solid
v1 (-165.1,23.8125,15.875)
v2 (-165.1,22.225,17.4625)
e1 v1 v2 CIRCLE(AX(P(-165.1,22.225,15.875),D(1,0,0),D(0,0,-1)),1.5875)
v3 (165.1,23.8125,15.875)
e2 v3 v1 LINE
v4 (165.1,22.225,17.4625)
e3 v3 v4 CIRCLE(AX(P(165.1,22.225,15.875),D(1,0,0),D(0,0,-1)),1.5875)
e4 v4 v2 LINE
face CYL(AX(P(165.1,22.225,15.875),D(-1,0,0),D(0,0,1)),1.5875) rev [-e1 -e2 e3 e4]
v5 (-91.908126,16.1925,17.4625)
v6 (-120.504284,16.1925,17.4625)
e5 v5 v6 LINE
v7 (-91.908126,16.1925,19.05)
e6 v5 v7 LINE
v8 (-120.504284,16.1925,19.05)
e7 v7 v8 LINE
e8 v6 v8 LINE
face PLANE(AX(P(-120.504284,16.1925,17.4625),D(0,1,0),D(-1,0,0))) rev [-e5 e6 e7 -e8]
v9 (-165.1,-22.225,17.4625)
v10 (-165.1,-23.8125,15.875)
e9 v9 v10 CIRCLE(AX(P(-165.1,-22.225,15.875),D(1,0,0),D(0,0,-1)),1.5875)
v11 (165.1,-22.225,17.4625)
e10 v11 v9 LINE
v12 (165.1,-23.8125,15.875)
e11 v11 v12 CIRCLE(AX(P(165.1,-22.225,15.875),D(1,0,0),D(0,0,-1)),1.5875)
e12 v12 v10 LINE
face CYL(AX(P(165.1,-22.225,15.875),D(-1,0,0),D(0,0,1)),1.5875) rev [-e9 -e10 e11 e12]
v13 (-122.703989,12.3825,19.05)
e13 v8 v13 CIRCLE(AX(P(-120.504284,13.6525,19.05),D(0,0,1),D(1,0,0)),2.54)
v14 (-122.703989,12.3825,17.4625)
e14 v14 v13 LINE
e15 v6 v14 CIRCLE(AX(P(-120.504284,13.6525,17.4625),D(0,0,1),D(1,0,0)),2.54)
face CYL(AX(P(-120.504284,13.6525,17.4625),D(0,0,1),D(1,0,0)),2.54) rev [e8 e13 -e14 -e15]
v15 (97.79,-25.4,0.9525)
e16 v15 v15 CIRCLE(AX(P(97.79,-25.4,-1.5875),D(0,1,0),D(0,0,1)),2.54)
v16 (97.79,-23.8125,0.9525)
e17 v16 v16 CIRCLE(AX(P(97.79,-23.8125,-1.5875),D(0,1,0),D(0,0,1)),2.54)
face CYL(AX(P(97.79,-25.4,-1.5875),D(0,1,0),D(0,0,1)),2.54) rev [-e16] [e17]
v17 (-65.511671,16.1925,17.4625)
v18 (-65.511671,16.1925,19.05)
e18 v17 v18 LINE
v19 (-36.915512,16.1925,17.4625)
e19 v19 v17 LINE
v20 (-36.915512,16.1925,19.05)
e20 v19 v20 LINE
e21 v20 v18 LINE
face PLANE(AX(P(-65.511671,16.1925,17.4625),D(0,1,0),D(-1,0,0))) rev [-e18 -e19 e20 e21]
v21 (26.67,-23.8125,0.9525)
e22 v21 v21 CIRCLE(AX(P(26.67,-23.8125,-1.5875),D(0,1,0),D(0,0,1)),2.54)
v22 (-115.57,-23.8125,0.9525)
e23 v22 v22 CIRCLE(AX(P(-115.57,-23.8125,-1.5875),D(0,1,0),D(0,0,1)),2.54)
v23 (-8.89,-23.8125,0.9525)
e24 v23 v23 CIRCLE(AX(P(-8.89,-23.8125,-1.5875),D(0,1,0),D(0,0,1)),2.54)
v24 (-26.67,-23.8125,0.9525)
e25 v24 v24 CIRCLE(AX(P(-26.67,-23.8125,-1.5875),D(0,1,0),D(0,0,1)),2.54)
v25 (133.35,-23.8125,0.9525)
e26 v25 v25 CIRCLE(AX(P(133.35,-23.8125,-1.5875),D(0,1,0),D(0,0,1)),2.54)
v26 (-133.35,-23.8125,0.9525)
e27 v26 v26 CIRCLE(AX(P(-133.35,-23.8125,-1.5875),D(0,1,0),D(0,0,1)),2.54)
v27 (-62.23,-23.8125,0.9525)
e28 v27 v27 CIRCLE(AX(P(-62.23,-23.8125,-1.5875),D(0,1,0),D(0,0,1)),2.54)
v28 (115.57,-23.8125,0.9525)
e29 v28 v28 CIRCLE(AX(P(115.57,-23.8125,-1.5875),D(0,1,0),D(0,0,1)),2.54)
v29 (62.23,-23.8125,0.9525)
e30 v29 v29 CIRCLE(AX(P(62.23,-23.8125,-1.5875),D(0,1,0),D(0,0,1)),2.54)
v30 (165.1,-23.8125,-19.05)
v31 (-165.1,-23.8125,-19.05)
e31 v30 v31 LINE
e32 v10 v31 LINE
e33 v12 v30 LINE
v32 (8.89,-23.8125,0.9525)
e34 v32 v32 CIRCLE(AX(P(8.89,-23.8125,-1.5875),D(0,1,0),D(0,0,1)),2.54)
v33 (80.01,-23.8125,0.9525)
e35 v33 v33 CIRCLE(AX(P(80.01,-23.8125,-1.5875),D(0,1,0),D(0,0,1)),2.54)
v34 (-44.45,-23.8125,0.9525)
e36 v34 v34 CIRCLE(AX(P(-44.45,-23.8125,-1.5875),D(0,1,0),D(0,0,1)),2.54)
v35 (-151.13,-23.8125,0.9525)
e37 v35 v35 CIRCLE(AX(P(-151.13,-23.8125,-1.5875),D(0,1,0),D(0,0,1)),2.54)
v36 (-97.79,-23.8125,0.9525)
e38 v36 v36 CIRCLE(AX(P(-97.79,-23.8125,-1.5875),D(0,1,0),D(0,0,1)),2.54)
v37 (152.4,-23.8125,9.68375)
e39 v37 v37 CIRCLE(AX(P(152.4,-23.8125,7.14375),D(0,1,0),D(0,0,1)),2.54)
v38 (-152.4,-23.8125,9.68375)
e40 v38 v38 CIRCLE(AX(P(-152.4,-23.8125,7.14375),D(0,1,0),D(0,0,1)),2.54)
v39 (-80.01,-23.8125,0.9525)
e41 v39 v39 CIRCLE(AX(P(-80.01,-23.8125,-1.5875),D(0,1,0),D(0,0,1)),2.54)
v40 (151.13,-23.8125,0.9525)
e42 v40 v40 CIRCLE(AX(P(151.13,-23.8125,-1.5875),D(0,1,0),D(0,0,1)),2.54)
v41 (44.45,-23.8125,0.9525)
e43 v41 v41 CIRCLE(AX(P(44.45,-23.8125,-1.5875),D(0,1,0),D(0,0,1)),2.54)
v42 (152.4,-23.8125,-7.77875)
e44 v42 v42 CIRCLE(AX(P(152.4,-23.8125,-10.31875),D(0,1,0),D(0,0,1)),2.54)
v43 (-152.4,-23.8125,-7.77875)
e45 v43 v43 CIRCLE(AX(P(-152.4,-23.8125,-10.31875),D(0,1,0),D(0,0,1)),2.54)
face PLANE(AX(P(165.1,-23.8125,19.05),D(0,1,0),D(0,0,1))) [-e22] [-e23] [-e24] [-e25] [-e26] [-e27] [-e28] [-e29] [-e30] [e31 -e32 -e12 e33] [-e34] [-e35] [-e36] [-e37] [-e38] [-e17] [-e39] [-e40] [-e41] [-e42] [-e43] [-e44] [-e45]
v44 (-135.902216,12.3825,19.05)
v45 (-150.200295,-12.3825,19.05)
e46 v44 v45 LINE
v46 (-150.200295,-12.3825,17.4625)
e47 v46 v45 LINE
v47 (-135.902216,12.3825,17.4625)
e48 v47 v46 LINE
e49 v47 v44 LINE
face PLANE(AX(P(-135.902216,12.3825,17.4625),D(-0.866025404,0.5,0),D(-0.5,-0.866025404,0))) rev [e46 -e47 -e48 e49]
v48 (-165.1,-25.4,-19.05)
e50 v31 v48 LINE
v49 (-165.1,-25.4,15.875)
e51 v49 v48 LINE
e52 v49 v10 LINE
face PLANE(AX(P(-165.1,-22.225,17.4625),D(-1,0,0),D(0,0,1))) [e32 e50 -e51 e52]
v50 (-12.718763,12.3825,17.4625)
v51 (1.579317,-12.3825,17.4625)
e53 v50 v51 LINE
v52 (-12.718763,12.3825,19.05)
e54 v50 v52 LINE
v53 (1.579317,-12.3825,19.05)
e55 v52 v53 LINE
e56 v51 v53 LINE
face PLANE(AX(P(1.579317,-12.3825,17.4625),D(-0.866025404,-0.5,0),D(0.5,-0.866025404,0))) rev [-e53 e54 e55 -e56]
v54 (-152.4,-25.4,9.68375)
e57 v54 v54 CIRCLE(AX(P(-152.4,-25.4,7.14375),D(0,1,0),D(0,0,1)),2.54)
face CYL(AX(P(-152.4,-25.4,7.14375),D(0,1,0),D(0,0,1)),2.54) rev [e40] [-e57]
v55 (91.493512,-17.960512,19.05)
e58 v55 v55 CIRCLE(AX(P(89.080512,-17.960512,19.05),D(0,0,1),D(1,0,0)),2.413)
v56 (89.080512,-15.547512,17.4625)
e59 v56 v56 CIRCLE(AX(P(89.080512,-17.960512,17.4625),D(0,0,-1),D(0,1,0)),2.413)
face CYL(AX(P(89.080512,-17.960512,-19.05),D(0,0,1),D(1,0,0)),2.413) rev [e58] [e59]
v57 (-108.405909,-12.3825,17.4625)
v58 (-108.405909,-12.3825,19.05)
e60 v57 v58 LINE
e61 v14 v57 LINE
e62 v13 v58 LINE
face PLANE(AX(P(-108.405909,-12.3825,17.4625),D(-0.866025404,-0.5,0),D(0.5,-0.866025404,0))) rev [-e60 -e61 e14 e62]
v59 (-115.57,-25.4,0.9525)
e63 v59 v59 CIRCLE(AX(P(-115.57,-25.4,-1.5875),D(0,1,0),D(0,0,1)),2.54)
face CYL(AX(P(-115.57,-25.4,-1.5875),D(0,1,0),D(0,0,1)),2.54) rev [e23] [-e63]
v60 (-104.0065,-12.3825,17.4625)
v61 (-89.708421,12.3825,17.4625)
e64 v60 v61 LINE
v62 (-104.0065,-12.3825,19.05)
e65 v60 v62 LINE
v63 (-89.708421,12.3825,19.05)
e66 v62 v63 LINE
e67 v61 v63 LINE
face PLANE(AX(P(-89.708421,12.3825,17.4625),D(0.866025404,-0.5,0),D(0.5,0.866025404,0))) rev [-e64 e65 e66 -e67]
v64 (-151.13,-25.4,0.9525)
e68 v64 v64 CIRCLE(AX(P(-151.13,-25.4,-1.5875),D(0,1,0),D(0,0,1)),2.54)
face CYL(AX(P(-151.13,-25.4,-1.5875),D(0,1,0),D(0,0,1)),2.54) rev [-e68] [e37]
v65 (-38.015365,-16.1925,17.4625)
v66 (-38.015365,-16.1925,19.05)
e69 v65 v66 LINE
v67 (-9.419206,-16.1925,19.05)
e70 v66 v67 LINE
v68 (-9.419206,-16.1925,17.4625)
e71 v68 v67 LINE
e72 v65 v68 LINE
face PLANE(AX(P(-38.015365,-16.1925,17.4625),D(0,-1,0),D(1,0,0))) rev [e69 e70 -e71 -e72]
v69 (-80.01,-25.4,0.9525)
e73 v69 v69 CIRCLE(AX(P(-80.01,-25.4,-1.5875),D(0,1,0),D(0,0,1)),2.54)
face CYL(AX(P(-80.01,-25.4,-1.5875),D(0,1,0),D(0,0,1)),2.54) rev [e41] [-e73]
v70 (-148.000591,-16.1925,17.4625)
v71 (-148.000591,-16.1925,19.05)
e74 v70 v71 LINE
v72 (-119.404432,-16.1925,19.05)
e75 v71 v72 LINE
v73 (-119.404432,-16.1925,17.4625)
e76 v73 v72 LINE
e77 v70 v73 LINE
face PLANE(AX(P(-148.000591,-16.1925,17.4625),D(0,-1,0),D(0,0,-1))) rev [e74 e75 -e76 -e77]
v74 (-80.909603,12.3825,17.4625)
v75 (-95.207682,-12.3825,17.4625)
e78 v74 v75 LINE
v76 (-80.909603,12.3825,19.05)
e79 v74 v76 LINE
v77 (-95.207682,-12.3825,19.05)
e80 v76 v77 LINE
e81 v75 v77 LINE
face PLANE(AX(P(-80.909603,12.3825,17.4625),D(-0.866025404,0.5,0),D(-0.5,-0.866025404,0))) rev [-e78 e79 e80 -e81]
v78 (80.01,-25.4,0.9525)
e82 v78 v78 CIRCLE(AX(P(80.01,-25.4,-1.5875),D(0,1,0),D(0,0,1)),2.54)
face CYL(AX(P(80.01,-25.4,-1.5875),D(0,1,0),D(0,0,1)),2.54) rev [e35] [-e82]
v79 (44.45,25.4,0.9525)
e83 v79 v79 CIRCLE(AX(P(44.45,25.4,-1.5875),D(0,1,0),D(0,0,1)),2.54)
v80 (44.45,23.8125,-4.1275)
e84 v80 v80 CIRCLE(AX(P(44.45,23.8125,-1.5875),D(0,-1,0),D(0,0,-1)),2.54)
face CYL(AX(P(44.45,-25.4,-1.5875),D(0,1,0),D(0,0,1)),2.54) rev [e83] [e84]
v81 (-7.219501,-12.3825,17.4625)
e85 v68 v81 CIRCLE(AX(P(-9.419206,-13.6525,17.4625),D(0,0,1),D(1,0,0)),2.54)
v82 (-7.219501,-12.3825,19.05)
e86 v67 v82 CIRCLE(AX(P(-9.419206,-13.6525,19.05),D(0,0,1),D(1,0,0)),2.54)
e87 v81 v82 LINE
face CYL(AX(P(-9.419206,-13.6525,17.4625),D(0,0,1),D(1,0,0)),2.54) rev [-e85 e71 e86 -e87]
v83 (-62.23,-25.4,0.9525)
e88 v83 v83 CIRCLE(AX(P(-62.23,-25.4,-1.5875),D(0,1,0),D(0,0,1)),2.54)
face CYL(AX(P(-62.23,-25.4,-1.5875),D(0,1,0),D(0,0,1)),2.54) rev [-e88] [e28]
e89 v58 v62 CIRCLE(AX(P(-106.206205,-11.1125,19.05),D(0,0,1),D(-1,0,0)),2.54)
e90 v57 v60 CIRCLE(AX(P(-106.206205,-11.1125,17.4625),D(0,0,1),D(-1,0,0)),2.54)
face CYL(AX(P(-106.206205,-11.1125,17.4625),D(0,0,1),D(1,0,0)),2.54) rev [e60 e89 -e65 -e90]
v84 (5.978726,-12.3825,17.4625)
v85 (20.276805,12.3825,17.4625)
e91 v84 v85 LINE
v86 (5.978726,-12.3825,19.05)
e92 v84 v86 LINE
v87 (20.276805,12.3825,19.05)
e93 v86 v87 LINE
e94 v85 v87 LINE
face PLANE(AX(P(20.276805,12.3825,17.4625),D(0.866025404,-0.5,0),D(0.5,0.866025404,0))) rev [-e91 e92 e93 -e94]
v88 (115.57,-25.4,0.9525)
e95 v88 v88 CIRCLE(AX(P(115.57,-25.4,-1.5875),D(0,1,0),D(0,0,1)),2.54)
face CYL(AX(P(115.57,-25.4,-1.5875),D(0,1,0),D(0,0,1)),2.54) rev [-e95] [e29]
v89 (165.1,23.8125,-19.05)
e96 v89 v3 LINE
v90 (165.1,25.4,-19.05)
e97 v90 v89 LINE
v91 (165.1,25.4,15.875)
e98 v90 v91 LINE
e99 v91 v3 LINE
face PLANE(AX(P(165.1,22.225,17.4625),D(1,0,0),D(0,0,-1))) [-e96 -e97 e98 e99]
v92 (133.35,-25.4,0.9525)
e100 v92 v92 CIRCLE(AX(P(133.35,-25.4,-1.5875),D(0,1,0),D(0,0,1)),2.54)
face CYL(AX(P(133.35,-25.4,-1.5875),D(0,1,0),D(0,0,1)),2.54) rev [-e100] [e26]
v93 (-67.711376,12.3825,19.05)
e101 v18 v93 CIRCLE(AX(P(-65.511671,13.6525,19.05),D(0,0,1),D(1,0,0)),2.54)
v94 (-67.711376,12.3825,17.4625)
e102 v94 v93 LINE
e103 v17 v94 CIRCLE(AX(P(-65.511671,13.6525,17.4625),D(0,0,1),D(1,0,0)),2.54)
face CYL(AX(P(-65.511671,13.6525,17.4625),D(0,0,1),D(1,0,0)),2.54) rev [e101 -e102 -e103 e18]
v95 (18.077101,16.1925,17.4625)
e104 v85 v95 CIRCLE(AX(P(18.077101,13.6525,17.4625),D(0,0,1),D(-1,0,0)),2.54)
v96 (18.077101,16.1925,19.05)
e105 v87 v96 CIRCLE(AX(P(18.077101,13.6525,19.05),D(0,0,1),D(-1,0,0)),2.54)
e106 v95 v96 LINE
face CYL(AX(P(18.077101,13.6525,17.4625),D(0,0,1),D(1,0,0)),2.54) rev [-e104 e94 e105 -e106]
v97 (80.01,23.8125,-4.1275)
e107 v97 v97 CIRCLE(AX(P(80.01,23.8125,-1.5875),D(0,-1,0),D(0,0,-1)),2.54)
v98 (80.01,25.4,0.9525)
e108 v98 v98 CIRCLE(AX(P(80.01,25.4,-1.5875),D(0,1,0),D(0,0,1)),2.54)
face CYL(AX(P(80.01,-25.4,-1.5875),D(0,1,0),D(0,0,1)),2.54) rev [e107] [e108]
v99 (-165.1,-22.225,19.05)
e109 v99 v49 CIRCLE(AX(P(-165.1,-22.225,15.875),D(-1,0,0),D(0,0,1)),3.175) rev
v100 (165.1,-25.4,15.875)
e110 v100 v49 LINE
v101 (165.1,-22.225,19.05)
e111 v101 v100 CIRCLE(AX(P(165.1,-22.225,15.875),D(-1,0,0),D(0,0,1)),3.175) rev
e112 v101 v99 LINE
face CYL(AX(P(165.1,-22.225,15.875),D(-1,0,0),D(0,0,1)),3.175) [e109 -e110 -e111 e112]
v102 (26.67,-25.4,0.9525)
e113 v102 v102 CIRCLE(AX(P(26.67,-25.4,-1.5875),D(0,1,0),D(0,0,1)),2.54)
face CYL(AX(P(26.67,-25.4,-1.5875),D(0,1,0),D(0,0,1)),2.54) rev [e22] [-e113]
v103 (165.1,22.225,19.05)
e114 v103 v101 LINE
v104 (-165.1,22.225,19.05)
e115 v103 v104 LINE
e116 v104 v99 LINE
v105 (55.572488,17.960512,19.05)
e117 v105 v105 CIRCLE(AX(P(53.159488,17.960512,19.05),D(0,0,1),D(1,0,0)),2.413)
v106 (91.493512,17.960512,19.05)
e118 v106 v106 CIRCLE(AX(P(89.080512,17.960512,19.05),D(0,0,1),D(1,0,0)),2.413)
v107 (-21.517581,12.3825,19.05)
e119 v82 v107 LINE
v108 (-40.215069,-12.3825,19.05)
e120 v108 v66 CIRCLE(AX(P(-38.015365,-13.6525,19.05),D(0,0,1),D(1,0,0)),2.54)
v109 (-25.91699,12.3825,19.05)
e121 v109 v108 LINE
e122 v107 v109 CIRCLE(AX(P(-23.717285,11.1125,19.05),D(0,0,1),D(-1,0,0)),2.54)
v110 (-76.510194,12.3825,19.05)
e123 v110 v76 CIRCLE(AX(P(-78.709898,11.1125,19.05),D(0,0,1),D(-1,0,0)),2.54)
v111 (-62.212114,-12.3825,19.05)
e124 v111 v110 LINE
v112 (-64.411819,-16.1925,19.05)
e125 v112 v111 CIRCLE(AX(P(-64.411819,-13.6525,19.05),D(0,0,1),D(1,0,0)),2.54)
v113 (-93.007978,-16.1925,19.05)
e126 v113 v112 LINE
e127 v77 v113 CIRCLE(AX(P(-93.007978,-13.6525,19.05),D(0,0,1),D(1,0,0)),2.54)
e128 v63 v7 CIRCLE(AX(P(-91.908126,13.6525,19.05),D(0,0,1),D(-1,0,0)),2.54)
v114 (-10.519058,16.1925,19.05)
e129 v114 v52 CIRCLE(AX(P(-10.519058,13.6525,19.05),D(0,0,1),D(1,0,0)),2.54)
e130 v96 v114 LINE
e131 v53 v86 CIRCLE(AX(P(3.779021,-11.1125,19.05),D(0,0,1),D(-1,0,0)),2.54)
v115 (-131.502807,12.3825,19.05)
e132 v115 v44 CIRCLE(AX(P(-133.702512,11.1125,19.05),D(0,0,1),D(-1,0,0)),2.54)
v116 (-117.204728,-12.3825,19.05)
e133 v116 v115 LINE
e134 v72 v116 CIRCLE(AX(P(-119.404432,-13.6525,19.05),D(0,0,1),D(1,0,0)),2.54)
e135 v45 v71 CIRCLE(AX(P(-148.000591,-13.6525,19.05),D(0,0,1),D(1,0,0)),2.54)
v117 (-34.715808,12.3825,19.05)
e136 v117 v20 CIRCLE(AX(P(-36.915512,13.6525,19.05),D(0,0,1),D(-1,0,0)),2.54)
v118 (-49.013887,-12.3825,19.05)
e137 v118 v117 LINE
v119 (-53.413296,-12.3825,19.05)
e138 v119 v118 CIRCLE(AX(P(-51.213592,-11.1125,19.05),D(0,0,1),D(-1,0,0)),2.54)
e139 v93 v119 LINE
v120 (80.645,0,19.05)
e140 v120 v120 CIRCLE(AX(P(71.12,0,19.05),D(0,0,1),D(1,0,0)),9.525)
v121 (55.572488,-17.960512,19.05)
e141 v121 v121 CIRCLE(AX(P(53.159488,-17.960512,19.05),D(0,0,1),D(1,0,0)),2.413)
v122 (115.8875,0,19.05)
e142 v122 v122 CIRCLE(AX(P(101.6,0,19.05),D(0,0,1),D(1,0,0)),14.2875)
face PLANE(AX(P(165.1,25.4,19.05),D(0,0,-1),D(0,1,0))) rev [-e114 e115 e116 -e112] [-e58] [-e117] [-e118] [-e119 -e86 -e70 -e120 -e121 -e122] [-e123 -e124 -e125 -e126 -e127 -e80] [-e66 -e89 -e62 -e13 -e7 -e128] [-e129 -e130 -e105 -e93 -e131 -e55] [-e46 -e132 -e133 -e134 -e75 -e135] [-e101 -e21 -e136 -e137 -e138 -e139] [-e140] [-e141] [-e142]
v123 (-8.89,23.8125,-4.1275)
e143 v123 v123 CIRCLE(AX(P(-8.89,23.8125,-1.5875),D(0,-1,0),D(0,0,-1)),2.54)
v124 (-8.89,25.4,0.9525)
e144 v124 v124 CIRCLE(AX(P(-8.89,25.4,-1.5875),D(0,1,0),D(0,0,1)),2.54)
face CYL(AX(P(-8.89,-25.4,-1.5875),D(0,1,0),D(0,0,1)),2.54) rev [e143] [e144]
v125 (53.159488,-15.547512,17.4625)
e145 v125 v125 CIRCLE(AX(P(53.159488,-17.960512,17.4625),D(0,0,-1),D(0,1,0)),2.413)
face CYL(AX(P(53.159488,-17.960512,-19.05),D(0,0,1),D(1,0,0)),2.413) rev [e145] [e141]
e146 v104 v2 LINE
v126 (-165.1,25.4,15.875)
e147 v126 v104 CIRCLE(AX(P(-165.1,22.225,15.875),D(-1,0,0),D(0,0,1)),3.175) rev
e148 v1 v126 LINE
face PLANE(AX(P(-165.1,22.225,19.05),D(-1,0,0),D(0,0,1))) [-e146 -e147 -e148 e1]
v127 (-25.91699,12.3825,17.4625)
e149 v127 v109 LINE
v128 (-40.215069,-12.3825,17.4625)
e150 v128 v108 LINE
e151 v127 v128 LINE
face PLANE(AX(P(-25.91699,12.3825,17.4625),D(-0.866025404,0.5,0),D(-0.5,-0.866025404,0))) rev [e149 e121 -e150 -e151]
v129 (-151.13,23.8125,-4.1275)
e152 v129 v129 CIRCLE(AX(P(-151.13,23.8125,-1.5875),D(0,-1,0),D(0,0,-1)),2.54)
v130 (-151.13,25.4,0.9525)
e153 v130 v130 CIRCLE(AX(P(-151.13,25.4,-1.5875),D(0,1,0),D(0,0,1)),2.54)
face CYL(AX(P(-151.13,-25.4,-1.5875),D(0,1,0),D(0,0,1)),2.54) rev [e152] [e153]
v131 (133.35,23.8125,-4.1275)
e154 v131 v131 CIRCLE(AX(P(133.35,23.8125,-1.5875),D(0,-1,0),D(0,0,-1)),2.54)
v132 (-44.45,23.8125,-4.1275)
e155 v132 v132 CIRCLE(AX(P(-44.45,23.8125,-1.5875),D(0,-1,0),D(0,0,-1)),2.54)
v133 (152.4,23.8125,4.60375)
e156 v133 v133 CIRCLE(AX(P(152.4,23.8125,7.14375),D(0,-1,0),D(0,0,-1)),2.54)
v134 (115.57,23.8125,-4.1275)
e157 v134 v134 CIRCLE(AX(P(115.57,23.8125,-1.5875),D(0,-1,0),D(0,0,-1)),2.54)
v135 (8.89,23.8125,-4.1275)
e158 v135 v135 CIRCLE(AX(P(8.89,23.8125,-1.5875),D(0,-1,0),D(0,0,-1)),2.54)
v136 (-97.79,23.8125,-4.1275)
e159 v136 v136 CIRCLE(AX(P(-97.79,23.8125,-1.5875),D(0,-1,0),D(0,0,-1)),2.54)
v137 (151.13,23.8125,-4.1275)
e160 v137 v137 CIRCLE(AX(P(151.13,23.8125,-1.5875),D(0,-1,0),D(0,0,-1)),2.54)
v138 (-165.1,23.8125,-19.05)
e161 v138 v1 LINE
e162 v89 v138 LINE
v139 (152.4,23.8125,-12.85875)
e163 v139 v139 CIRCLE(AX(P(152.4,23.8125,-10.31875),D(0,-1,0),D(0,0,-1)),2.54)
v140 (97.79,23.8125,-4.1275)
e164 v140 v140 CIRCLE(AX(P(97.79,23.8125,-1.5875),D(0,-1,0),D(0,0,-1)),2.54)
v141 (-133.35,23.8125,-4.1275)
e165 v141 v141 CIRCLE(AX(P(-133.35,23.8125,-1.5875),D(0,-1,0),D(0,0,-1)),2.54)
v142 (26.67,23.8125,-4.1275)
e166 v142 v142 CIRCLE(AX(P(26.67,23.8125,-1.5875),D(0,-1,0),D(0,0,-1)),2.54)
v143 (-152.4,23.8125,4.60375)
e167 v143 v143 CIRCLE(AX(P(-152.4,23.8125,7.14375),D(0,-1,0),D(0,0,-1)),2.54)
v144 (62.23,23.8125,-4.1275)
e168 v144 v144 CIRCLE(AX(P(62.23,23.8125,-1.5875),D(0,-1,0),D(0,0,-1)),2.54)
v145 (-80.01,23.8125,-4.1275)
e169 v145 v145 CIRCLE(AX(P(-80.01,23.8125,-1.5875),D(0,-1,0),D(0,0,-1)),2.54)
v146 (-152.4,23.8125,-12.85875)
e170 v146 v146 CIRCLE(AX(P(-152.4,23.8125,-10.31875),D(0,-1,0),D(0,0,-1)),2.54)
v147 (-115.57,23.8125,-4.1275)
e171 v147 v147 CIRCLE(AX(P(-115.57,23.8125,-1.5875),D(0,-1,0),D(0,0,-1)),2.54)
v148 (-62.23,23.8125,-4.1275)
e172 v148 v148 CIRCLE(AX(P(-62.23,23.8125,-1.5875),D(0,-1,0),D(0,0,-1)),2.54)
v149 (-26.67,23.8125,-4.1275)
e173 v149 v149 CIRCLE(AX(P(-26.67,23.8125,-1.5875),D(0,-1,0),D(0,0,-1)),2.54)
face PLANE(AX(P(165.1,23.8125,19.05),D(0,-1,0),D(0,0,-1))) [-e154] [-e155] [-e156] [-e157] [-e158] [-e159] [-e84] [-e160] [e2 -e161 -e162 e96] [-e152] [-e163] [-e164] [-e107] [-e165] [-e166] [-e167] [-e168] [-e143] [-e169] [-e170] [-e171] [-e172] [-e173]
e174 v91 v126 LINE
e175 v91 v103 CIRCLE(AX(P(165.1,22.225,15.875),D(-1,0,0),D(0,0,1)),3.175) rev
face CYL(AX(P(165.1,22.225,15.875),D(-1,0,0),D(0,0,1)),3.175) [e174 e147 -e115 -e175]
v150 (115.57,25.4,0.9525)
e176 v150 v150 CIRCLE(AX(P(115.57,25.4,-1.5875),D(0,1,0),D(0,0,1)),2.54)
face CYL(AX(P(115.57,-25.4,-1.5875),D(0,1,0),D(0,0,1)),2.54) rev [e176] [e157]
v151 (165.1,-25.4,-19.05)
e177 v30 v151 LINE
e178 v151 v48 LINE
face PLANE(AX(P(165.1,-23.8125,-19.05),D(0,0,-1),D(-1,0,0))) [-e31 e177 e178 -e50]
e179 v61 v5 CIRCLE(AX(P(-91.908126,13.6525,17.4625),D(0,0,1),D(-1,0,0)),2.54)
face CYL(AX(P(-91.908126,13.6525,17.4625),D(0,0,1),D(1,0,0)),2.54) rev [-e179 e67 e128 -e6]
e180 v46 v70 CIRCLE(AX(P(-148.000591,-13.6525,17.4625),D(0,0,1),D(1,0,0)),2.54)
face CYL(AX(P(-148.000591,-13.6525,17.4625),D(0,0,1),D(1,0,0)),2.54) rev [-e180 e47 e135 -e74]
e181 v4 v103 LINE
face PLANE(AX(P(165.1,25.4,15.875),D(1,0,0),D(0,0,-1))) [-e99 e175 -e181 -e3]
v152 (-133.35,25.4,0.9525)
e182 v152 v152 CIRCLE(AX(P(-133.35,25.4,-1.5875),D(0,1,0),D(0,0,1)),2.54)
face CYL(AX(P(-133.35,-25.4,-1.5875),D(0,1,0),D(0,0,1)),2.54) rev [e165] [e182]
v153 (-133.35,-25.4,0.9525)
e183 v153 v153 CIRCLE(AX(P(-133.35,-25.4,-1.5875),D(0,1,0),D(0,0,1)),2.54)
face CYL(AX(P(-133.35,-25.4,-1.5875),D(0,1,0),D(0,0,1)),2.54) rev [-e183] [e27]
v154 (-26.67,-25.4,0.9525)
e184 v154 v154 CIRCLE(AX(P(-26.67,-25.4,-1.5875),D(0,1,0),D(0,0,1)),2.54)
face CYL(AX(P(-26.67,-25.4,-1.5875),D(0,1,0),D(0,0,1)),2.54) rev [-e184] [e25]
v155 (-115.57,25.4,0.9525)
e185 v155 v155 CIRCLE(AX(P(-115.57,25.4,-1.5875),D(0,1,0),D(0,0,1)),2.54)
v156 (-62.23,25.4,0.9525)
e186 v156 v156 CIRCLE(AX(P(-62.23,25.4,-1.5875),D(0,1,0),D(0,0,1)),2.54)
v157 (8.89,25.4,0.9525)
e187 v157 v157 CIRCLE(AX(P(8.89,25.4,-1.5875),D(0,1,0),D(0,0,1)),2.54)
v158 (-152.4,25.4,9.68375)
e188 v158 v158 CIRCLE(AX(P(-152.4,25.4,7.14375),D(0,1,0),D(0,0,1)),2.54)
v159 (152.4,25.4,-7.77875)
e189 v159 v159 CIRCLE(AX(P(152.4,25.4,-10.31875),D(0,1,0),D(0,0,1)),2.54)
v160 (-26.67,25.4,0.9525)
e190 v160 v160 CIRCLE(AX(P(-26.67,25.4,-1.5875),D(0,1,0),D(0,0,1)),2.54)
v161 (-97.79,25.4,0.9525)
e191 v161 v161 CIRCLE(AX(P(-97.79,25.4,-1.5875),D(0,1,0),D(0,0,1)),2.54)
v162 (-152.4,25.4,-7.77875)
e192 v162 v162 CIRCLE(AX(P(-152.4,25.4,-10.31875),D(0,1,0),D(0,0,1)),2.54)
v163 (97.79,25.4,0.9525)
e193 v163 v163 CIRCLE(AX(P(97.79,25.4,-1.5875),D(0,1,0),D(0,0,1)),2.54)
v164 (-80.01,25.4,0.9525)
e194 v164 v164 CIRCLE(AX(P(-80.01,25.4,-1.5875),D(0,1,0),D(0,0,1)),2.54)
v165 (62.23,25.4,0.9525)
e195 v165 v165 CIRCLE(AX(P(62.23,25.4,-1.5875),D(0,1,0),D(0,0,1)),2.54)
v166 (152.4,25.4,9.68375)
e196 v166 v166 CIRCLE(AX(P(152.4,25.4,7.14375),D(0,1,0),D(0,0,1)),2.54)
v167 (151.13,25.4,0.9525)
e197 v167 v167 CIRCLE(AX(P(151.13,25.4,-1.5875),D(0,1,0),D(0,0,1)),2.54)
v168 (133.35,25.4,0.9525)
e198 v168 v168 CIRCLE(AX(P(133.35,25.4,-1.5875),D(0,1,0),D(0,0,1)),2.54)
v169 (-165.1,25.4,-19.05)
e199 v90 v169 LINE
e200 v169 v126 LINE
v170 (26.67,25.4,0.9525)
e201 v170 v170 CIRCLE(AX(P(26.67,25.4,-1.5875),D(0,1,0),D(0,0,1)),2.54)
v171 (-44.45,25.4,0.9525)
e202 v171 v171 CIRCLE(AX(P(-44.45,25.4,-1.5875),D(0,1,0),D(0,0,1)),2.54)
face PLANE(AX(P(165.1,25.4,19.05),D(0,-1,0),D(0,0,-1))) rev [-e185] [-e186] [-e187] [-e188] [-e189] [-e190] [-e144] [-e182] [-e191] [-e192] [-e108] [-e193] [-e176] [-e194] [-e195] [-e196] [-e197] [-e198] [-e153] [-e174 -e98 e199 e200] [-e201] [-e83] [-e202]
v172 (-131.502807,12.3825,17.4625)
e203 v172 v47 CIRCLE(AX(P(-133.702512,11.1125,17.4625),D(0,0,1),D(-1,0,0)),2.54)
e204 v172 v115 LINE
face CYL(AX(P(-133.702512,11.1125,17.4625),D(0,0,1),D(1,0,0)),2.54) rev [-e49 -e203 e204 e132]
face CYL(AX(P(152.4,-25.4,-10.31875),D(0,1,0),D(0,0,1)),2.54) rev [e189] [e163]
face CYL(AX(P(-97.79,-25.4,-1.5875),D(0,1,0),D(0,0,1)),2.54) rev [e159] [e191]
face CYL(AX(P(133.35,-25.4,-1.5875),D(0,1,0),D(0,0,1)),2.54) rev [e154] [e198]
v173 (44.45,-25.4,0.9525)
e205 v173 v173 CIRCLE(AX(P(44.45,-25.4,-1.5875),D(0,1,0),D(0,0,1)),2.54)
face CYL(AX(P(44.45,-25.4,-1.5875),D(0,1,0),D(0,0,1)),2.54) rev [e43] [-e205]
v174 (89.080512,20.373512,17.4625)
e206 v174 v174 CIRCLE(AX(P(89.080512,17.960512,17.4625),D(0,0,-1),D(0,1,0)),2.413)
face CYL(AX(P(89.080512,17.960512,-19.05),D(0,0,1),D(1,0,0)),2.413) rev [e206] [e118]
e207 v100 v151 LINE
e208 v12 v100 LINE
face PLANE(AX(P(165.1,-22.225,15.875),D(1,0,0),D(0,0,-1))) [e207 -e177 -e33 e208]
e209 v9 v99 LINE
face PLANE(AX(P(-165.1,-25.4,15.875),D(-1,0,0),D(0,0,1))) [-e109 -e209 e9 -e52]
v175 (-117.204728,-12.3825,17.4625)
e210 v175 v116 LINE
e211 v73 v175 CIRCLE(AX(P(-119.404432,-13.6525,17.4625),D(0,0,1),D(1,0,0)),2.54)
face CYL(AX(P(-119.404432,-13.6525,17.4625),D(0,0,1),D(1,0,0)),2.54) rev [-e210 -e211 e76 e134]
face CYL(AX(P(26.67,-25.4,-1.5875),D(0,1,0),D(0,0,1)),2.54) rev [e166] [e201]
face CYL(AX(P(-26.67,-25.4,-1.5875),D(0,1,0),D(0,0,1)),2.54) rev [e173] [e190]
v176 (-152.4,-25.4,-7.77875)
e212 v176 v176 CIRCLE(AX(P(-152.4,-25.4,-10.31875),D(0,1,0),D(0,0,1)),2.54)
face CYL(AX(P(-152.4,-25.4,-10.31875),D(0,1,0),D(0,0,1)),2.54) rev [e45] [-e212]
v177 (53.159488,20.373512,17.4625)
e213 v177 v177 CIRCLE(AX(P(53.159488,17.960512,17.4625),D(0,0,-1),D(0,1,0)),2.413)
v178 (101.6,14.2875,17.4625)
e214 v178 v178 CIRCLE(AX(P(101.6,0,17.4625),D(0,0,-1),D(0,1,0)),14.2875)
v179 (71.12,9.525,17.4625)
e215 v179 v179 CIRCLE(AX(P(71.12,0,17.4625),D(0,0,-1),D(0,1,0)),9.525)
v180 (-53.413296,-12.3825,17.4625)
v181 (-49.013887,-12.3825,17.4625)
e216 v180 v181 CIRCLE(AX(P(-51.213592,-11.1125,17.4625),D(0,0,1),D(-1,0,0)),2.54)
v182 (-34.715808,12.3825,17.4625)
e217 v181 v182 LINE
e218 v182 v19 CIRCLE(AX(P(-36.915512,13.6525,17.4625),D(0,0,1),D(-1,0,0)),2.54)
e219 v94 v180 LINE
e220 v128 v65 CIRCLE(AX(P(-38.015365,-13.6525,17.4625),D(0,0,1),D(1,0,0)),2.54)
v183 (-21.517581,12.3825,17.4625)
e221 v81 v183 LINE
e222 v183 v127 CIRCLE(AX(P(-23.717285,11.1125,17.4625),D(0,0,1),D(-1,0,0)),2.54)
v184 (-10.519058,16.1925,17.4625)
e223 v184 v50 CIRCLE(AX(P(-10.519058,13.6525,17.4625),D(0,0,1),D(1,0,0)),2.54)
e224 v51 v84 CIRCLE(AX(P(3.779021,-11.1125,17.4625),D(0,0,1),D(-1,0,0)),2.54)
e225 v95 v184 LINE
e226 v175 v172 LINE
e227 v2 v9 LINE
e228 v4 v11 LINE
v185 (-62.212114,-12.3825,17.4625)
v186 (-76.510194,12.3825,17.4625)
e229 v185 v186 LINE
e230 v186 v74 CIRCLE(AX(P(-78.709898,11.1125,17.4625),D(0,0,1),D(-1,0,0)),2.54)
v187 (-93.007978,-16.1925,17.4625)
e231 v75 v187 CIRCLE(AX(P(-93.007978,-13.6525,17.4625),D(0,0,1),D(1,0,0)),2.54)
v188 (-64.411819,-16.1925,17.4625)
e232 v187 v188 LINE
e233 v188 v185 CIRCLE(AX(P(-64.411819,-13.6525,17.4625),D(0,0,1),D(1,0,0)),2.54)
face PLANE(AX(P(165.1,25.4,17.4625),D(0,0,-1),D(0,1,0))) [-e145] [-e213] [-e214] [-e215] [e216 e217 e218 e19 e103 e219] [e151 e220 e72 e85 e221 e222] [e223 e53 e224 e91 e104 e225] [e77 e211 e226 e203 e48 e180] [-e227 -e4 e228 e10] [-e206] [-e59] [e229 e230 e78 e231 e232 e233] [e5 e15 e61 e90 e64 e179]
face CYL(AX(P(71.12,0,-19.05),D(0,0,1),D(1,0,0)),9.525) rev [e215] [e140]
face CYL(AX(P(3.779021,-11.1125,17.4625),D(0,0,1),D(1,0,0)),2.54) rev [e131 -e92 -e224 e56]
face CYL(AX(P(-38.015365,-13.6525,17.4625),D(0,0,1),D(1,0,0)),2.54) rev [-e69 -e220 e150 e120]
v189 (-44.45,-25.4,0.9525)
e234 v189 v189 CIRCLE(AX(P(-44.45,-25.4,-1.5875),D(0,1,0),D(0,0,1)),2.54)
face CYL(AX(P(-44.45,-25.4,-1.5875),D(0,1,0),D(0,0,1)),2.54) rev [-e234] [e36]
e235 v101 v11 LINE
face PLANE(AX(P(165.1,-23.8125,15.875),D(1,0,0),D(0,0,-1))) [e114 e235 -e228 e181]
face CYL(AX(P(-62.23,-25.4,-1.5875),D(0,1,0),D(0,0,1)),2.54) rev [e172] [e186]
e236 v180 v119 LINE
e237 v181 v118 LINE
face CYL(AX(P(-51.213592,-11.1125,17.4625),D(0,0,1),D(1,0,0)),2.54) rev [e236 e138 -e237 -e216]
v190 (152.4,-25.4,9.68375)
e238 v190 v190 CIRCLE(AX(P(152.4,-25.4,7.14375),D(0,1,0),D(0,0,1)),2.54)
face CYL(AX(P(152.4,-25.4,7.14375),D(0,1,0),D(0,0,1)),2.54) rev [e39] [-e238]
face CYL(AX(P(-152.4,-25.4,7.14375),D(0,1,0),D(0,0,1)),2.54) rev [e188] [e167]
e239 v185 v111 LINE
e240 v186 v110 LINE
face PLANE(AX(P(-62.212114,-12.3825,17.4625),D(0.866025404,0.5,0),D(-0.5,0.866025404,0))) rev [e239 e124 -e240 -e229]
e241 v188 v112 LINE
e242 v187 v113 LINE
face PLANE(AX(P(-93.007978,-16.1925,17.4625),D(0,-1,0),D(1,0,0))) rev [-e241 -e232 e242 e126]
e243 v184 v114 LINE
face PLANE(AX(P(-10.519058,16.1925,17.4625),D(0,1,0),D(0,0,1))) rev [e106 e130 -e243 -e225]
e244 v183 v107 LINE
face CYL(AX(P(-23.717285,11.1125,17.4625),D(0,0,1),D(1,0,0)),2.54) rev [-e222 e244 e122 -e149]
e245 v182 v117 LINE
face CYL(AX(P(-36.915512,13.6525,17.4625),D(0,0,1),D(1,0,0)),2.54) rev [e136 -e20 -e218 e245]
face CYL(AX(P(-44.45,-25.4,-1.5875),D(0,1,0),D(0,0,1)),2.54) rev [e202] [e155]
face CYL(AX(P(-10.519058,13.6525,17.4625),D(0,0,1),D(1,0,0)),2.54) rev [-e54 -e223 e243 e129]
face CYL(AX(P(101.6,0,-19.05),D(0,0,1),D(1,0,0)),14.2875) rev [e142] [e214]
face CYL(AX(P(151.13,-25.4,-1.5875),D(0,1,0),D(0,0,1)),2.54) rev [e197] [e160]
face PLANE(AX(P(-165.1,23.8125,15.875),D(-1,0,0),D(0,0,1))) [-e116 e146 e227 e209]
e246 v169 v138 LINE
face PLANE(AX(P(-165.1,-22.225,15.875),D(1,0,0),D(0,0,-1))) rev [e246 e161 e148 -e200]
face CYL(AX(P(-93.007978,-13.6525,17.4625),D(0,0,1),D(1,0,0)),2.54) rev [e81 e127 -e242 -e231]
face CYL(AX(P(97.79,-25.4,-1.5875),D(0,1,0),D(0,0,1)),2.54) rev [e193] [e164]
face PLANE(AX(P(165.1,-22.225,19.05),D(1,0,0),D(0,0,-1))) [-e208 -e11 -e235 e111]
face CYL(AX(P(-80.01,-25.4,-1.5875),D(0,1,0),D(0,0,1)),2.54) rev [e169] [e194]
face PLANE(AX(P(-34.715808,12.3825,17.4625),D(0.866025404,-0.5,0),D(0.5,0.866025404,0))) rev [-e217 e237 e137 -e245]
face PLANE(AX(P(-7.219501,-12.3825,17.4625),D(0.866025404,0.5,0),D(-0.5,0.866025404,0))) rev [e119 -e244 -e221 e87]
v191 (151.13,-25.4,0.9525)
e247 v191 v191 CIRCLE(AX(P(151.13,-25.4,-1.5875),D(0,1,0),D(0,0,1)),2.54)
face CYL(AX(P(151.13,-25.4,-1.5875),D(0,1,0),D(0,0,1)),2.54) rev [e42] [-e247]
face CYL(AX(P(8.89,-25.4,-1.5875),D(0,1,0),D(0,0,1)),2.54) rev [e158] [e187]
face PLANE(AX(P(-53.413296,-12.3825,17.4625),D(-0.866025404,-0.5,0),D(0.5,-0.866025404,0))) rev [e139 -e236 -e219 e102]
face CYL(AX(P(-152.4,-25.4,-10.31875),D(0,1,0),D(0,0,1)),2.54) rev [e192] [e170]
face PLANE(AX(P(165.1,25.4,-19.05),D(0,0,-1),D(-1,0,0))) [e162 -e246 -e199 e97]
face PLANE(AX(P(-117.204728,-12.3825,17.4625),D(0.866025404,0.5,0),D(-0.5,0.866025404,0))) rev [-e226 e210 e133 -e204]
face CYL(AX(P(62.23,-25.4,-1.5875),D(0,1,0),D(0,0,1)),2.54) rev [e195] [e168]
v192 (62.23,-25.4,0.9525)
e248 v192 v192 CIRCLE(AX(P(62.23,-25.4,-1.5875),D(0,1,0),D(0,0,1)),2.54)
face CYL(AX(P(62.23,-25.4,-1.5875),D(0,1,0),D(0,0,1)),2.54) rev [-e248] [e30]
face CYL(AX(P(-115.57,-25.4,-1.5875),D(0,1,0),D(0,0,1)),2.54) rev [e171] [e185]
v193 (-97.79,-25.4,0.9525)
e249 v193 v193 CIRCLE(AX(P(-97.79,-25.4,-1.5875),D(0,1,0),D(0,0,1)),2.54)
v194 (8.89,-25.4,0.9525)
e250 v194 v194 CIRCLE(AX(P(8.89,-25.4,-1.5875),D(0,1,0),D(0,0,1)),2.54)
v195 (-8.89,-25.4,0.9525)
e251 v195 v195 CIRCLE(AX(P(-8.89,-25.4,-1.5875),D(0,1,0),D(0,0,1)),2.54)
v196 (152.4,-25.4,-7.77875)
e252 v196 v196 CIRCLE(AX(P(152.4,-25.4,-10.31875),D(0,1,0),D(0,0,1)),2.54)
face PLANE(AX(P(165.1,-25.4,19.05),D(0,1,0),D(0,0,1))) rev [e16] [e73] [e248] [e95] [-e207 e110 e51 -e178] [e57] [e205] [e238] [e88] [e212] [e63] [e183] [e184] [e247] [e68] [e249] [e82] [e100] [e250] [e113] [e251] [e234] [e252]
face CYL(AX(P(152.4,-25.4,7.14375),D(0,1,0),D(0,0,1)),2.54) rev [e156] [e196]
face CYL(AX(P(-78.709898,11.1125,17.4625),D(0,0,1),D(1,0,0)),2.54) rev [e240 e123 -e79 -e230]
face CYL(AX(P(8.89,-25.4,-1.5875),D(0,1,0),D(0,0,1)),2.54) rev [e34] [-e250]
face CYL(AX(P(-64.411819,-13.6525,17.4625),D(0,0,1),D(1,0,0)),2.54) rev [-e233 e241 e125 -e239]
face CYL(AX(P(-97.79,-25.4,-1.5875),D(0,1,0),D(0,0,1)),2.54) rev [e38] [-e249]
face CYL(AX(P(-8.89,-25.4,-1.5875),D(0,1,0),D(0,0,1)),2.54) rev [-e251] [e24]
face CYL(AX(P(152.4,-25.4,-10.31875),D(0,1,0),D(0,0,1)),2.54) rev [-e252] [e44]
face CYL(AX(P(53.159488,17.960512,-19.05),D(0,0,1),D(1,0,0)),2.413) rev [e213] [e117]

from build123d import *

# Parameters (mm, degrees)
BASE_FLANGE2_DEPTH = 165.1
SKETCH10_R         = 2.54
CUT_EXTRUDE1_DEPTH = 174.785938729
SKETCH11_R         = 14.2875
SKETCH11_R_2       = 9.525
SKETCH11_R_3       = 2.413
CUT_EXTRUDE2_DEPTH = 172.332367053
CUT_EXTRUDE3_DEPTH = 2.54
SKETCH13_R         = 2.54
CUT_EXTRUDE4_DEPTH = 174.785938729


# Sheet-metal steps are written as plain solids
with BuildPart() as part:
    # Sketch1 → Base-Flange2 (new, symmetric)
    with BuildSketch(Plane(origin=(0, 0, 0), x_dir=(0, 0, -1), z_dir=(1, 0, 0))):
        with BuildLine():
            Line((19.05, -25.4), (-15.875, -25.4))
            ThreePointArc((-15.875, -25.4), (-18.12006403, -24.47006403), (-19.05, -22.225))
            Line((-19.05, -22.225), (-19.05, 22.225))
            ThreePointArc((-19.05, 22.225), (-18.12006403, 24.47006403), (-15.875, 25.4))
            Line((-15.875, 25.4), (19.05, 25.4))
            Line((19.05, 25.4), (19.05, 23.8125))
            Line((19.05, 23.8125), (-15.875, 23.8125))
            ThreePointArc((-15.875, 23.8125), (-16.997532015, 23.347532015), (-17.4625, 22.225))
            Line((-17.4625, 22.225), (-17.4625, -22.225))
            ThreePointArc((-17.4625, -22.225), (-16.997532015, -23.347532015), (-15.875, -23.8125))
            Line((-15.875, -23.8125), (19.05, -23.8125))
            Line((19.05, -23.8125), (19.05, -25.4))
        make_face()
    extrude(amount=BASE_FLANGE2_DEPTH, both=True)

    # Sketch10 → Cut-Extrude1 (cut, through all)
    with BuildSketch(Plane(origin=(0, 25.4, 0), x_dir=(1, 0, 0), z_dir=(0, 1, 0))):
        with Locations(Location((151.13, 1.5875, 0), (0, 0, 270))):
            Circle(SKETCH10_R)
        with Locations(Location((133.35, 1.5875, 0), (0, 0, 270))):
            Circle(SKETCH10_R)
        with Locations(Location((115.57, 1.5875, 0), (0, 0, 270))):
            Circle(SKETCH10_R)
        with Locations(Location((97.79, 1.5875, 0), (0, 0, 270))):
            Circle(SKETCH10_R)
        with Locations(Location((80.01, 1.5875, 0), (0, 0, 270))):
            Circle(SKETCH10_R)
        with Locations(Location((62.23, 1.5875, 0), (0, 0, 270))):
            Circle(SKETCH10_R)
        with Locations(Location((44.45, 1.5875, 0), (0, 0, 270))):
            Circle(SKETCH10_R)
        with Locations(Location((26.67, 1.5875, 0), (0, 0, 270))):
            Circle(SKETCH10_R)
        with Locations(Location((8.89, 1.5875, 0), (0, 0, 270))):
            Circle(SKETCH10_R)
        with Locations(Location((-8.89, 1.5875, 0), (0, 0, 270))):
            Circle(SKETCH10_R)
        with Locations(Location((-26.67, 1.5875, 0), (0, 0, 270))):
            Circle(SKETCH10_R)
        with Locations(Location((-44.45, 1.5875, 0), (0, 0, 270))):
            Circle(SKETCH10_R)
        with Locations(Location((-62.23, 1.5875, 0), (0, 0, 270))):
            Circle(SKETCH10_R)
        with Locations(Location((-80.01, 1.5875, 0), (0, 0, 270))):
            Circle(SKETCH10_R)
        with Locations(Location((-97.79, 1.5875, 0), (0, 0, 270))):
            Circle(SKETCH10_R)
        with Locations(Location((-115.57, 1.5875, 0), (0, 0, 270))):
            Circle(SKETCH10_R)
        with Locations(Location((-133.35, 1.5875, 0), (0, 0, 270))):
            Circle(SKETCH10_R)
        with Locations(Location((-151.13, 1.5875, 0), (0, 0, 270))):
            Circle(SKETCH10_R)
    extrude(amount=-CUT_EXTRUDE1_DEPTH, mode=Mode.SUBTRACT)

    # Sketch11 → Cut-Extrude2 (cut, through all)
    with BuildSketch(Plane.XY.offset(19.05)):
        with Locations((101.6, 0)):
            Circle(SKETCH11_R)
        with Locations((71.12, 0)):
            Circle(SKETCH11_R_2)
        with Locations((53.159487758, 17.960512242)):
            Circle(SKETCH11_R_3)
        with Locations((89.080512242, 17.960512242)):
            Circle(SKETCH11_R_3)
        with Locations((89.080512242, -17.960512242)):
            Circle(SKETCH11_R_3)
        with Locations((53.159487758, -17.960512242)):
            Circle(SKETCH11_R_3)
    extrude(amount=-CUT_EXTRUDE2_DEPTH, mode=Mode.SUBTRACT)

    # Sketch12 → Cut-Extrude3 (cut)
    with BuildSketch(Plane.XY.offset(19.05)):
        with BuildLine():
            Line((-135.902216058, 12.3825), (-150.200295474, -12.3825))
            ThreePointArc((-150.200295474, -12.3825), (-150.200295474, -14.9225), (-148.000590949, -16.1925))
            Line((-148.000590949, -16.1925), (-119.404432116, -16.1925))
            ThreePointArc((-119.404432116, -16.1925), (-117.20472759, -14.9225), (-117.20472759, -12.3825))
            Line((-117.20472759, -12.3825), (-131.502807007, 12.3825))
            ThreePointArc((-131.502807007, 12.3825), (-133.702511532, 13.6525), (-135.902216058, 12.3825))
        make_face()
        with BuildLine():
            Line((-120.504284379, 16.1925), (-91.908125546, 16.1925))
            ThreePointArc((-91.908125546, 16.1925), (-89.70842102, 14.9225), (-89.70842102, 12.3825))
            Line((-89.70842102, 12.3825), (-104.006500437, -12.3825))
            ThreePointArc((-104.006500437, -12.3825), (-106.206204962, -13.6525), (-108.405909488, -12.3825))
            Line((-108.405909488, -12.3825), (-122.703988904, 12.3825))
            ThreePointArc((-122.703988904, 12.3825), (-122.703988904, 14.9225), (-120.504284379, 16.1925))
        make_face()
        with BuildLine():
            Line((-80.909602918, 12.3825), (-95.207682334, -12.3825))
            ThreePointArc((-95.207682334, -12.3825), (-95.207682334, -14.9225), (-93.007977808, -16.1925))
            Line((-93.007977808, -16.1925), (-64.411818976, -16.1925))
            ThreePointArc((-64.411818976, -16.1925), (-62.21211445, -14.9225), (-62.21211445, -12.3825))
            Line((-62.21211445, -12.3825), (-76.510193866, 12.3825))
            ThreePointArc((-76.510193866, 12.3825), (-78.709898392, 13.6525), (-80.909602918, 12.3825))
        make_face()
        with BuildLine():
            Line((-65.511671238, 16.1925), (-36.915512405, 16.1925))
            ThreePointArc((-36.915512405, 16.1925), (-34.71580788, 14.9225), (-34.71580788, 12.3825))
            Line((-34.71580788, 12.3825), (-49.013887296, -12.3825))
            ThreePointArc((-49.013887296, -12.3825), (-51.213591822, -13.6525), (-53.413296347, -12.3825))
            Line((-53.413296347, -12.3825), (-67.711375764, 12.3825))
            ThreePointArc((-67.711375764, 12.3825), (-67.711375764, 14.9225), (-65.511671238, 16.1925))
        make_face()
        with BuildLine():
            Line((-25.916989777, 12.3825), (-40.215069194, -12.3825))
            ThreePointArc((-40.215069194, -12.3825), (-40.215069194, -14.9225), (-38.015364668, -16.1925))
            Line((-38.015364668, -16.1925), (-9.419205835, -16.1925))
            ThreePointArc((-9.419205835, -16.1925), (-7.21950131, -14.9225), (-7.21950131, -12.3825))
            Line((-7.21950131, -12.3825), (-21.517580726, 12.3825))
            ThreePointArc((-21.517580726, 12.3825), (-23.717285252, 13.6525), (-25.916989777, 12.3825))
        make_face()
        with BuildLine():
            Line((-10.519058098, 16.1925), (18.077100735, 16.1925))
            ThreePointArc((18.077100735, 16.1925), (20.276805261, 14.9225), (20.276805261, 12.3825))
            Line((20.276805261, 12.3825), (5.978725844, -12.3825))
            ThreePointArc((5.978725844, -12.3825), (3.779021318, -13.6525), (1.579316793, -12.3825))
            Line((1.579316793, -12.3825), (-12.718762624, 12.3825))
            ThreePointArc((-12.718762624, 12.3825), (-12.718762624, 14.9225), (-10.519058098, 16.1925))
        make_face()
    extrude(amount=-CUT_EXTRUDE3_DEPTH, mode=Mode.SUBTRACT)

    # Sketch13 → Cut-Extrude4 (cut, through all)
    with BuildSketch(Plane(origin=(0, 25.4, 0), x_dir=(1, 0, 0), z_dir=(0, 1, 0))):
        with Locations(Location((-152.4, 10.31875, 0), (0, 0, 270))):
            Circle(SKETCH13_R)
        with Locations(Location((-152.4, -7.14375, 0), (0, 0, 270))):
            Circle(SKETCH13_R)
        with Locations(Location((152.4, -7.14375, 0), (0, 0, 270))):
            Circle(SKETCH13_R)
        with Locations(Location((152.4, 10.31875, 0), (0, 0, 270))):
            Circle(SKETCH13_R)
    extrude(amount=-CUT_EXTRUDE4_DEPTH, mode=Mode.SUBTRACT)


solid = part.part
